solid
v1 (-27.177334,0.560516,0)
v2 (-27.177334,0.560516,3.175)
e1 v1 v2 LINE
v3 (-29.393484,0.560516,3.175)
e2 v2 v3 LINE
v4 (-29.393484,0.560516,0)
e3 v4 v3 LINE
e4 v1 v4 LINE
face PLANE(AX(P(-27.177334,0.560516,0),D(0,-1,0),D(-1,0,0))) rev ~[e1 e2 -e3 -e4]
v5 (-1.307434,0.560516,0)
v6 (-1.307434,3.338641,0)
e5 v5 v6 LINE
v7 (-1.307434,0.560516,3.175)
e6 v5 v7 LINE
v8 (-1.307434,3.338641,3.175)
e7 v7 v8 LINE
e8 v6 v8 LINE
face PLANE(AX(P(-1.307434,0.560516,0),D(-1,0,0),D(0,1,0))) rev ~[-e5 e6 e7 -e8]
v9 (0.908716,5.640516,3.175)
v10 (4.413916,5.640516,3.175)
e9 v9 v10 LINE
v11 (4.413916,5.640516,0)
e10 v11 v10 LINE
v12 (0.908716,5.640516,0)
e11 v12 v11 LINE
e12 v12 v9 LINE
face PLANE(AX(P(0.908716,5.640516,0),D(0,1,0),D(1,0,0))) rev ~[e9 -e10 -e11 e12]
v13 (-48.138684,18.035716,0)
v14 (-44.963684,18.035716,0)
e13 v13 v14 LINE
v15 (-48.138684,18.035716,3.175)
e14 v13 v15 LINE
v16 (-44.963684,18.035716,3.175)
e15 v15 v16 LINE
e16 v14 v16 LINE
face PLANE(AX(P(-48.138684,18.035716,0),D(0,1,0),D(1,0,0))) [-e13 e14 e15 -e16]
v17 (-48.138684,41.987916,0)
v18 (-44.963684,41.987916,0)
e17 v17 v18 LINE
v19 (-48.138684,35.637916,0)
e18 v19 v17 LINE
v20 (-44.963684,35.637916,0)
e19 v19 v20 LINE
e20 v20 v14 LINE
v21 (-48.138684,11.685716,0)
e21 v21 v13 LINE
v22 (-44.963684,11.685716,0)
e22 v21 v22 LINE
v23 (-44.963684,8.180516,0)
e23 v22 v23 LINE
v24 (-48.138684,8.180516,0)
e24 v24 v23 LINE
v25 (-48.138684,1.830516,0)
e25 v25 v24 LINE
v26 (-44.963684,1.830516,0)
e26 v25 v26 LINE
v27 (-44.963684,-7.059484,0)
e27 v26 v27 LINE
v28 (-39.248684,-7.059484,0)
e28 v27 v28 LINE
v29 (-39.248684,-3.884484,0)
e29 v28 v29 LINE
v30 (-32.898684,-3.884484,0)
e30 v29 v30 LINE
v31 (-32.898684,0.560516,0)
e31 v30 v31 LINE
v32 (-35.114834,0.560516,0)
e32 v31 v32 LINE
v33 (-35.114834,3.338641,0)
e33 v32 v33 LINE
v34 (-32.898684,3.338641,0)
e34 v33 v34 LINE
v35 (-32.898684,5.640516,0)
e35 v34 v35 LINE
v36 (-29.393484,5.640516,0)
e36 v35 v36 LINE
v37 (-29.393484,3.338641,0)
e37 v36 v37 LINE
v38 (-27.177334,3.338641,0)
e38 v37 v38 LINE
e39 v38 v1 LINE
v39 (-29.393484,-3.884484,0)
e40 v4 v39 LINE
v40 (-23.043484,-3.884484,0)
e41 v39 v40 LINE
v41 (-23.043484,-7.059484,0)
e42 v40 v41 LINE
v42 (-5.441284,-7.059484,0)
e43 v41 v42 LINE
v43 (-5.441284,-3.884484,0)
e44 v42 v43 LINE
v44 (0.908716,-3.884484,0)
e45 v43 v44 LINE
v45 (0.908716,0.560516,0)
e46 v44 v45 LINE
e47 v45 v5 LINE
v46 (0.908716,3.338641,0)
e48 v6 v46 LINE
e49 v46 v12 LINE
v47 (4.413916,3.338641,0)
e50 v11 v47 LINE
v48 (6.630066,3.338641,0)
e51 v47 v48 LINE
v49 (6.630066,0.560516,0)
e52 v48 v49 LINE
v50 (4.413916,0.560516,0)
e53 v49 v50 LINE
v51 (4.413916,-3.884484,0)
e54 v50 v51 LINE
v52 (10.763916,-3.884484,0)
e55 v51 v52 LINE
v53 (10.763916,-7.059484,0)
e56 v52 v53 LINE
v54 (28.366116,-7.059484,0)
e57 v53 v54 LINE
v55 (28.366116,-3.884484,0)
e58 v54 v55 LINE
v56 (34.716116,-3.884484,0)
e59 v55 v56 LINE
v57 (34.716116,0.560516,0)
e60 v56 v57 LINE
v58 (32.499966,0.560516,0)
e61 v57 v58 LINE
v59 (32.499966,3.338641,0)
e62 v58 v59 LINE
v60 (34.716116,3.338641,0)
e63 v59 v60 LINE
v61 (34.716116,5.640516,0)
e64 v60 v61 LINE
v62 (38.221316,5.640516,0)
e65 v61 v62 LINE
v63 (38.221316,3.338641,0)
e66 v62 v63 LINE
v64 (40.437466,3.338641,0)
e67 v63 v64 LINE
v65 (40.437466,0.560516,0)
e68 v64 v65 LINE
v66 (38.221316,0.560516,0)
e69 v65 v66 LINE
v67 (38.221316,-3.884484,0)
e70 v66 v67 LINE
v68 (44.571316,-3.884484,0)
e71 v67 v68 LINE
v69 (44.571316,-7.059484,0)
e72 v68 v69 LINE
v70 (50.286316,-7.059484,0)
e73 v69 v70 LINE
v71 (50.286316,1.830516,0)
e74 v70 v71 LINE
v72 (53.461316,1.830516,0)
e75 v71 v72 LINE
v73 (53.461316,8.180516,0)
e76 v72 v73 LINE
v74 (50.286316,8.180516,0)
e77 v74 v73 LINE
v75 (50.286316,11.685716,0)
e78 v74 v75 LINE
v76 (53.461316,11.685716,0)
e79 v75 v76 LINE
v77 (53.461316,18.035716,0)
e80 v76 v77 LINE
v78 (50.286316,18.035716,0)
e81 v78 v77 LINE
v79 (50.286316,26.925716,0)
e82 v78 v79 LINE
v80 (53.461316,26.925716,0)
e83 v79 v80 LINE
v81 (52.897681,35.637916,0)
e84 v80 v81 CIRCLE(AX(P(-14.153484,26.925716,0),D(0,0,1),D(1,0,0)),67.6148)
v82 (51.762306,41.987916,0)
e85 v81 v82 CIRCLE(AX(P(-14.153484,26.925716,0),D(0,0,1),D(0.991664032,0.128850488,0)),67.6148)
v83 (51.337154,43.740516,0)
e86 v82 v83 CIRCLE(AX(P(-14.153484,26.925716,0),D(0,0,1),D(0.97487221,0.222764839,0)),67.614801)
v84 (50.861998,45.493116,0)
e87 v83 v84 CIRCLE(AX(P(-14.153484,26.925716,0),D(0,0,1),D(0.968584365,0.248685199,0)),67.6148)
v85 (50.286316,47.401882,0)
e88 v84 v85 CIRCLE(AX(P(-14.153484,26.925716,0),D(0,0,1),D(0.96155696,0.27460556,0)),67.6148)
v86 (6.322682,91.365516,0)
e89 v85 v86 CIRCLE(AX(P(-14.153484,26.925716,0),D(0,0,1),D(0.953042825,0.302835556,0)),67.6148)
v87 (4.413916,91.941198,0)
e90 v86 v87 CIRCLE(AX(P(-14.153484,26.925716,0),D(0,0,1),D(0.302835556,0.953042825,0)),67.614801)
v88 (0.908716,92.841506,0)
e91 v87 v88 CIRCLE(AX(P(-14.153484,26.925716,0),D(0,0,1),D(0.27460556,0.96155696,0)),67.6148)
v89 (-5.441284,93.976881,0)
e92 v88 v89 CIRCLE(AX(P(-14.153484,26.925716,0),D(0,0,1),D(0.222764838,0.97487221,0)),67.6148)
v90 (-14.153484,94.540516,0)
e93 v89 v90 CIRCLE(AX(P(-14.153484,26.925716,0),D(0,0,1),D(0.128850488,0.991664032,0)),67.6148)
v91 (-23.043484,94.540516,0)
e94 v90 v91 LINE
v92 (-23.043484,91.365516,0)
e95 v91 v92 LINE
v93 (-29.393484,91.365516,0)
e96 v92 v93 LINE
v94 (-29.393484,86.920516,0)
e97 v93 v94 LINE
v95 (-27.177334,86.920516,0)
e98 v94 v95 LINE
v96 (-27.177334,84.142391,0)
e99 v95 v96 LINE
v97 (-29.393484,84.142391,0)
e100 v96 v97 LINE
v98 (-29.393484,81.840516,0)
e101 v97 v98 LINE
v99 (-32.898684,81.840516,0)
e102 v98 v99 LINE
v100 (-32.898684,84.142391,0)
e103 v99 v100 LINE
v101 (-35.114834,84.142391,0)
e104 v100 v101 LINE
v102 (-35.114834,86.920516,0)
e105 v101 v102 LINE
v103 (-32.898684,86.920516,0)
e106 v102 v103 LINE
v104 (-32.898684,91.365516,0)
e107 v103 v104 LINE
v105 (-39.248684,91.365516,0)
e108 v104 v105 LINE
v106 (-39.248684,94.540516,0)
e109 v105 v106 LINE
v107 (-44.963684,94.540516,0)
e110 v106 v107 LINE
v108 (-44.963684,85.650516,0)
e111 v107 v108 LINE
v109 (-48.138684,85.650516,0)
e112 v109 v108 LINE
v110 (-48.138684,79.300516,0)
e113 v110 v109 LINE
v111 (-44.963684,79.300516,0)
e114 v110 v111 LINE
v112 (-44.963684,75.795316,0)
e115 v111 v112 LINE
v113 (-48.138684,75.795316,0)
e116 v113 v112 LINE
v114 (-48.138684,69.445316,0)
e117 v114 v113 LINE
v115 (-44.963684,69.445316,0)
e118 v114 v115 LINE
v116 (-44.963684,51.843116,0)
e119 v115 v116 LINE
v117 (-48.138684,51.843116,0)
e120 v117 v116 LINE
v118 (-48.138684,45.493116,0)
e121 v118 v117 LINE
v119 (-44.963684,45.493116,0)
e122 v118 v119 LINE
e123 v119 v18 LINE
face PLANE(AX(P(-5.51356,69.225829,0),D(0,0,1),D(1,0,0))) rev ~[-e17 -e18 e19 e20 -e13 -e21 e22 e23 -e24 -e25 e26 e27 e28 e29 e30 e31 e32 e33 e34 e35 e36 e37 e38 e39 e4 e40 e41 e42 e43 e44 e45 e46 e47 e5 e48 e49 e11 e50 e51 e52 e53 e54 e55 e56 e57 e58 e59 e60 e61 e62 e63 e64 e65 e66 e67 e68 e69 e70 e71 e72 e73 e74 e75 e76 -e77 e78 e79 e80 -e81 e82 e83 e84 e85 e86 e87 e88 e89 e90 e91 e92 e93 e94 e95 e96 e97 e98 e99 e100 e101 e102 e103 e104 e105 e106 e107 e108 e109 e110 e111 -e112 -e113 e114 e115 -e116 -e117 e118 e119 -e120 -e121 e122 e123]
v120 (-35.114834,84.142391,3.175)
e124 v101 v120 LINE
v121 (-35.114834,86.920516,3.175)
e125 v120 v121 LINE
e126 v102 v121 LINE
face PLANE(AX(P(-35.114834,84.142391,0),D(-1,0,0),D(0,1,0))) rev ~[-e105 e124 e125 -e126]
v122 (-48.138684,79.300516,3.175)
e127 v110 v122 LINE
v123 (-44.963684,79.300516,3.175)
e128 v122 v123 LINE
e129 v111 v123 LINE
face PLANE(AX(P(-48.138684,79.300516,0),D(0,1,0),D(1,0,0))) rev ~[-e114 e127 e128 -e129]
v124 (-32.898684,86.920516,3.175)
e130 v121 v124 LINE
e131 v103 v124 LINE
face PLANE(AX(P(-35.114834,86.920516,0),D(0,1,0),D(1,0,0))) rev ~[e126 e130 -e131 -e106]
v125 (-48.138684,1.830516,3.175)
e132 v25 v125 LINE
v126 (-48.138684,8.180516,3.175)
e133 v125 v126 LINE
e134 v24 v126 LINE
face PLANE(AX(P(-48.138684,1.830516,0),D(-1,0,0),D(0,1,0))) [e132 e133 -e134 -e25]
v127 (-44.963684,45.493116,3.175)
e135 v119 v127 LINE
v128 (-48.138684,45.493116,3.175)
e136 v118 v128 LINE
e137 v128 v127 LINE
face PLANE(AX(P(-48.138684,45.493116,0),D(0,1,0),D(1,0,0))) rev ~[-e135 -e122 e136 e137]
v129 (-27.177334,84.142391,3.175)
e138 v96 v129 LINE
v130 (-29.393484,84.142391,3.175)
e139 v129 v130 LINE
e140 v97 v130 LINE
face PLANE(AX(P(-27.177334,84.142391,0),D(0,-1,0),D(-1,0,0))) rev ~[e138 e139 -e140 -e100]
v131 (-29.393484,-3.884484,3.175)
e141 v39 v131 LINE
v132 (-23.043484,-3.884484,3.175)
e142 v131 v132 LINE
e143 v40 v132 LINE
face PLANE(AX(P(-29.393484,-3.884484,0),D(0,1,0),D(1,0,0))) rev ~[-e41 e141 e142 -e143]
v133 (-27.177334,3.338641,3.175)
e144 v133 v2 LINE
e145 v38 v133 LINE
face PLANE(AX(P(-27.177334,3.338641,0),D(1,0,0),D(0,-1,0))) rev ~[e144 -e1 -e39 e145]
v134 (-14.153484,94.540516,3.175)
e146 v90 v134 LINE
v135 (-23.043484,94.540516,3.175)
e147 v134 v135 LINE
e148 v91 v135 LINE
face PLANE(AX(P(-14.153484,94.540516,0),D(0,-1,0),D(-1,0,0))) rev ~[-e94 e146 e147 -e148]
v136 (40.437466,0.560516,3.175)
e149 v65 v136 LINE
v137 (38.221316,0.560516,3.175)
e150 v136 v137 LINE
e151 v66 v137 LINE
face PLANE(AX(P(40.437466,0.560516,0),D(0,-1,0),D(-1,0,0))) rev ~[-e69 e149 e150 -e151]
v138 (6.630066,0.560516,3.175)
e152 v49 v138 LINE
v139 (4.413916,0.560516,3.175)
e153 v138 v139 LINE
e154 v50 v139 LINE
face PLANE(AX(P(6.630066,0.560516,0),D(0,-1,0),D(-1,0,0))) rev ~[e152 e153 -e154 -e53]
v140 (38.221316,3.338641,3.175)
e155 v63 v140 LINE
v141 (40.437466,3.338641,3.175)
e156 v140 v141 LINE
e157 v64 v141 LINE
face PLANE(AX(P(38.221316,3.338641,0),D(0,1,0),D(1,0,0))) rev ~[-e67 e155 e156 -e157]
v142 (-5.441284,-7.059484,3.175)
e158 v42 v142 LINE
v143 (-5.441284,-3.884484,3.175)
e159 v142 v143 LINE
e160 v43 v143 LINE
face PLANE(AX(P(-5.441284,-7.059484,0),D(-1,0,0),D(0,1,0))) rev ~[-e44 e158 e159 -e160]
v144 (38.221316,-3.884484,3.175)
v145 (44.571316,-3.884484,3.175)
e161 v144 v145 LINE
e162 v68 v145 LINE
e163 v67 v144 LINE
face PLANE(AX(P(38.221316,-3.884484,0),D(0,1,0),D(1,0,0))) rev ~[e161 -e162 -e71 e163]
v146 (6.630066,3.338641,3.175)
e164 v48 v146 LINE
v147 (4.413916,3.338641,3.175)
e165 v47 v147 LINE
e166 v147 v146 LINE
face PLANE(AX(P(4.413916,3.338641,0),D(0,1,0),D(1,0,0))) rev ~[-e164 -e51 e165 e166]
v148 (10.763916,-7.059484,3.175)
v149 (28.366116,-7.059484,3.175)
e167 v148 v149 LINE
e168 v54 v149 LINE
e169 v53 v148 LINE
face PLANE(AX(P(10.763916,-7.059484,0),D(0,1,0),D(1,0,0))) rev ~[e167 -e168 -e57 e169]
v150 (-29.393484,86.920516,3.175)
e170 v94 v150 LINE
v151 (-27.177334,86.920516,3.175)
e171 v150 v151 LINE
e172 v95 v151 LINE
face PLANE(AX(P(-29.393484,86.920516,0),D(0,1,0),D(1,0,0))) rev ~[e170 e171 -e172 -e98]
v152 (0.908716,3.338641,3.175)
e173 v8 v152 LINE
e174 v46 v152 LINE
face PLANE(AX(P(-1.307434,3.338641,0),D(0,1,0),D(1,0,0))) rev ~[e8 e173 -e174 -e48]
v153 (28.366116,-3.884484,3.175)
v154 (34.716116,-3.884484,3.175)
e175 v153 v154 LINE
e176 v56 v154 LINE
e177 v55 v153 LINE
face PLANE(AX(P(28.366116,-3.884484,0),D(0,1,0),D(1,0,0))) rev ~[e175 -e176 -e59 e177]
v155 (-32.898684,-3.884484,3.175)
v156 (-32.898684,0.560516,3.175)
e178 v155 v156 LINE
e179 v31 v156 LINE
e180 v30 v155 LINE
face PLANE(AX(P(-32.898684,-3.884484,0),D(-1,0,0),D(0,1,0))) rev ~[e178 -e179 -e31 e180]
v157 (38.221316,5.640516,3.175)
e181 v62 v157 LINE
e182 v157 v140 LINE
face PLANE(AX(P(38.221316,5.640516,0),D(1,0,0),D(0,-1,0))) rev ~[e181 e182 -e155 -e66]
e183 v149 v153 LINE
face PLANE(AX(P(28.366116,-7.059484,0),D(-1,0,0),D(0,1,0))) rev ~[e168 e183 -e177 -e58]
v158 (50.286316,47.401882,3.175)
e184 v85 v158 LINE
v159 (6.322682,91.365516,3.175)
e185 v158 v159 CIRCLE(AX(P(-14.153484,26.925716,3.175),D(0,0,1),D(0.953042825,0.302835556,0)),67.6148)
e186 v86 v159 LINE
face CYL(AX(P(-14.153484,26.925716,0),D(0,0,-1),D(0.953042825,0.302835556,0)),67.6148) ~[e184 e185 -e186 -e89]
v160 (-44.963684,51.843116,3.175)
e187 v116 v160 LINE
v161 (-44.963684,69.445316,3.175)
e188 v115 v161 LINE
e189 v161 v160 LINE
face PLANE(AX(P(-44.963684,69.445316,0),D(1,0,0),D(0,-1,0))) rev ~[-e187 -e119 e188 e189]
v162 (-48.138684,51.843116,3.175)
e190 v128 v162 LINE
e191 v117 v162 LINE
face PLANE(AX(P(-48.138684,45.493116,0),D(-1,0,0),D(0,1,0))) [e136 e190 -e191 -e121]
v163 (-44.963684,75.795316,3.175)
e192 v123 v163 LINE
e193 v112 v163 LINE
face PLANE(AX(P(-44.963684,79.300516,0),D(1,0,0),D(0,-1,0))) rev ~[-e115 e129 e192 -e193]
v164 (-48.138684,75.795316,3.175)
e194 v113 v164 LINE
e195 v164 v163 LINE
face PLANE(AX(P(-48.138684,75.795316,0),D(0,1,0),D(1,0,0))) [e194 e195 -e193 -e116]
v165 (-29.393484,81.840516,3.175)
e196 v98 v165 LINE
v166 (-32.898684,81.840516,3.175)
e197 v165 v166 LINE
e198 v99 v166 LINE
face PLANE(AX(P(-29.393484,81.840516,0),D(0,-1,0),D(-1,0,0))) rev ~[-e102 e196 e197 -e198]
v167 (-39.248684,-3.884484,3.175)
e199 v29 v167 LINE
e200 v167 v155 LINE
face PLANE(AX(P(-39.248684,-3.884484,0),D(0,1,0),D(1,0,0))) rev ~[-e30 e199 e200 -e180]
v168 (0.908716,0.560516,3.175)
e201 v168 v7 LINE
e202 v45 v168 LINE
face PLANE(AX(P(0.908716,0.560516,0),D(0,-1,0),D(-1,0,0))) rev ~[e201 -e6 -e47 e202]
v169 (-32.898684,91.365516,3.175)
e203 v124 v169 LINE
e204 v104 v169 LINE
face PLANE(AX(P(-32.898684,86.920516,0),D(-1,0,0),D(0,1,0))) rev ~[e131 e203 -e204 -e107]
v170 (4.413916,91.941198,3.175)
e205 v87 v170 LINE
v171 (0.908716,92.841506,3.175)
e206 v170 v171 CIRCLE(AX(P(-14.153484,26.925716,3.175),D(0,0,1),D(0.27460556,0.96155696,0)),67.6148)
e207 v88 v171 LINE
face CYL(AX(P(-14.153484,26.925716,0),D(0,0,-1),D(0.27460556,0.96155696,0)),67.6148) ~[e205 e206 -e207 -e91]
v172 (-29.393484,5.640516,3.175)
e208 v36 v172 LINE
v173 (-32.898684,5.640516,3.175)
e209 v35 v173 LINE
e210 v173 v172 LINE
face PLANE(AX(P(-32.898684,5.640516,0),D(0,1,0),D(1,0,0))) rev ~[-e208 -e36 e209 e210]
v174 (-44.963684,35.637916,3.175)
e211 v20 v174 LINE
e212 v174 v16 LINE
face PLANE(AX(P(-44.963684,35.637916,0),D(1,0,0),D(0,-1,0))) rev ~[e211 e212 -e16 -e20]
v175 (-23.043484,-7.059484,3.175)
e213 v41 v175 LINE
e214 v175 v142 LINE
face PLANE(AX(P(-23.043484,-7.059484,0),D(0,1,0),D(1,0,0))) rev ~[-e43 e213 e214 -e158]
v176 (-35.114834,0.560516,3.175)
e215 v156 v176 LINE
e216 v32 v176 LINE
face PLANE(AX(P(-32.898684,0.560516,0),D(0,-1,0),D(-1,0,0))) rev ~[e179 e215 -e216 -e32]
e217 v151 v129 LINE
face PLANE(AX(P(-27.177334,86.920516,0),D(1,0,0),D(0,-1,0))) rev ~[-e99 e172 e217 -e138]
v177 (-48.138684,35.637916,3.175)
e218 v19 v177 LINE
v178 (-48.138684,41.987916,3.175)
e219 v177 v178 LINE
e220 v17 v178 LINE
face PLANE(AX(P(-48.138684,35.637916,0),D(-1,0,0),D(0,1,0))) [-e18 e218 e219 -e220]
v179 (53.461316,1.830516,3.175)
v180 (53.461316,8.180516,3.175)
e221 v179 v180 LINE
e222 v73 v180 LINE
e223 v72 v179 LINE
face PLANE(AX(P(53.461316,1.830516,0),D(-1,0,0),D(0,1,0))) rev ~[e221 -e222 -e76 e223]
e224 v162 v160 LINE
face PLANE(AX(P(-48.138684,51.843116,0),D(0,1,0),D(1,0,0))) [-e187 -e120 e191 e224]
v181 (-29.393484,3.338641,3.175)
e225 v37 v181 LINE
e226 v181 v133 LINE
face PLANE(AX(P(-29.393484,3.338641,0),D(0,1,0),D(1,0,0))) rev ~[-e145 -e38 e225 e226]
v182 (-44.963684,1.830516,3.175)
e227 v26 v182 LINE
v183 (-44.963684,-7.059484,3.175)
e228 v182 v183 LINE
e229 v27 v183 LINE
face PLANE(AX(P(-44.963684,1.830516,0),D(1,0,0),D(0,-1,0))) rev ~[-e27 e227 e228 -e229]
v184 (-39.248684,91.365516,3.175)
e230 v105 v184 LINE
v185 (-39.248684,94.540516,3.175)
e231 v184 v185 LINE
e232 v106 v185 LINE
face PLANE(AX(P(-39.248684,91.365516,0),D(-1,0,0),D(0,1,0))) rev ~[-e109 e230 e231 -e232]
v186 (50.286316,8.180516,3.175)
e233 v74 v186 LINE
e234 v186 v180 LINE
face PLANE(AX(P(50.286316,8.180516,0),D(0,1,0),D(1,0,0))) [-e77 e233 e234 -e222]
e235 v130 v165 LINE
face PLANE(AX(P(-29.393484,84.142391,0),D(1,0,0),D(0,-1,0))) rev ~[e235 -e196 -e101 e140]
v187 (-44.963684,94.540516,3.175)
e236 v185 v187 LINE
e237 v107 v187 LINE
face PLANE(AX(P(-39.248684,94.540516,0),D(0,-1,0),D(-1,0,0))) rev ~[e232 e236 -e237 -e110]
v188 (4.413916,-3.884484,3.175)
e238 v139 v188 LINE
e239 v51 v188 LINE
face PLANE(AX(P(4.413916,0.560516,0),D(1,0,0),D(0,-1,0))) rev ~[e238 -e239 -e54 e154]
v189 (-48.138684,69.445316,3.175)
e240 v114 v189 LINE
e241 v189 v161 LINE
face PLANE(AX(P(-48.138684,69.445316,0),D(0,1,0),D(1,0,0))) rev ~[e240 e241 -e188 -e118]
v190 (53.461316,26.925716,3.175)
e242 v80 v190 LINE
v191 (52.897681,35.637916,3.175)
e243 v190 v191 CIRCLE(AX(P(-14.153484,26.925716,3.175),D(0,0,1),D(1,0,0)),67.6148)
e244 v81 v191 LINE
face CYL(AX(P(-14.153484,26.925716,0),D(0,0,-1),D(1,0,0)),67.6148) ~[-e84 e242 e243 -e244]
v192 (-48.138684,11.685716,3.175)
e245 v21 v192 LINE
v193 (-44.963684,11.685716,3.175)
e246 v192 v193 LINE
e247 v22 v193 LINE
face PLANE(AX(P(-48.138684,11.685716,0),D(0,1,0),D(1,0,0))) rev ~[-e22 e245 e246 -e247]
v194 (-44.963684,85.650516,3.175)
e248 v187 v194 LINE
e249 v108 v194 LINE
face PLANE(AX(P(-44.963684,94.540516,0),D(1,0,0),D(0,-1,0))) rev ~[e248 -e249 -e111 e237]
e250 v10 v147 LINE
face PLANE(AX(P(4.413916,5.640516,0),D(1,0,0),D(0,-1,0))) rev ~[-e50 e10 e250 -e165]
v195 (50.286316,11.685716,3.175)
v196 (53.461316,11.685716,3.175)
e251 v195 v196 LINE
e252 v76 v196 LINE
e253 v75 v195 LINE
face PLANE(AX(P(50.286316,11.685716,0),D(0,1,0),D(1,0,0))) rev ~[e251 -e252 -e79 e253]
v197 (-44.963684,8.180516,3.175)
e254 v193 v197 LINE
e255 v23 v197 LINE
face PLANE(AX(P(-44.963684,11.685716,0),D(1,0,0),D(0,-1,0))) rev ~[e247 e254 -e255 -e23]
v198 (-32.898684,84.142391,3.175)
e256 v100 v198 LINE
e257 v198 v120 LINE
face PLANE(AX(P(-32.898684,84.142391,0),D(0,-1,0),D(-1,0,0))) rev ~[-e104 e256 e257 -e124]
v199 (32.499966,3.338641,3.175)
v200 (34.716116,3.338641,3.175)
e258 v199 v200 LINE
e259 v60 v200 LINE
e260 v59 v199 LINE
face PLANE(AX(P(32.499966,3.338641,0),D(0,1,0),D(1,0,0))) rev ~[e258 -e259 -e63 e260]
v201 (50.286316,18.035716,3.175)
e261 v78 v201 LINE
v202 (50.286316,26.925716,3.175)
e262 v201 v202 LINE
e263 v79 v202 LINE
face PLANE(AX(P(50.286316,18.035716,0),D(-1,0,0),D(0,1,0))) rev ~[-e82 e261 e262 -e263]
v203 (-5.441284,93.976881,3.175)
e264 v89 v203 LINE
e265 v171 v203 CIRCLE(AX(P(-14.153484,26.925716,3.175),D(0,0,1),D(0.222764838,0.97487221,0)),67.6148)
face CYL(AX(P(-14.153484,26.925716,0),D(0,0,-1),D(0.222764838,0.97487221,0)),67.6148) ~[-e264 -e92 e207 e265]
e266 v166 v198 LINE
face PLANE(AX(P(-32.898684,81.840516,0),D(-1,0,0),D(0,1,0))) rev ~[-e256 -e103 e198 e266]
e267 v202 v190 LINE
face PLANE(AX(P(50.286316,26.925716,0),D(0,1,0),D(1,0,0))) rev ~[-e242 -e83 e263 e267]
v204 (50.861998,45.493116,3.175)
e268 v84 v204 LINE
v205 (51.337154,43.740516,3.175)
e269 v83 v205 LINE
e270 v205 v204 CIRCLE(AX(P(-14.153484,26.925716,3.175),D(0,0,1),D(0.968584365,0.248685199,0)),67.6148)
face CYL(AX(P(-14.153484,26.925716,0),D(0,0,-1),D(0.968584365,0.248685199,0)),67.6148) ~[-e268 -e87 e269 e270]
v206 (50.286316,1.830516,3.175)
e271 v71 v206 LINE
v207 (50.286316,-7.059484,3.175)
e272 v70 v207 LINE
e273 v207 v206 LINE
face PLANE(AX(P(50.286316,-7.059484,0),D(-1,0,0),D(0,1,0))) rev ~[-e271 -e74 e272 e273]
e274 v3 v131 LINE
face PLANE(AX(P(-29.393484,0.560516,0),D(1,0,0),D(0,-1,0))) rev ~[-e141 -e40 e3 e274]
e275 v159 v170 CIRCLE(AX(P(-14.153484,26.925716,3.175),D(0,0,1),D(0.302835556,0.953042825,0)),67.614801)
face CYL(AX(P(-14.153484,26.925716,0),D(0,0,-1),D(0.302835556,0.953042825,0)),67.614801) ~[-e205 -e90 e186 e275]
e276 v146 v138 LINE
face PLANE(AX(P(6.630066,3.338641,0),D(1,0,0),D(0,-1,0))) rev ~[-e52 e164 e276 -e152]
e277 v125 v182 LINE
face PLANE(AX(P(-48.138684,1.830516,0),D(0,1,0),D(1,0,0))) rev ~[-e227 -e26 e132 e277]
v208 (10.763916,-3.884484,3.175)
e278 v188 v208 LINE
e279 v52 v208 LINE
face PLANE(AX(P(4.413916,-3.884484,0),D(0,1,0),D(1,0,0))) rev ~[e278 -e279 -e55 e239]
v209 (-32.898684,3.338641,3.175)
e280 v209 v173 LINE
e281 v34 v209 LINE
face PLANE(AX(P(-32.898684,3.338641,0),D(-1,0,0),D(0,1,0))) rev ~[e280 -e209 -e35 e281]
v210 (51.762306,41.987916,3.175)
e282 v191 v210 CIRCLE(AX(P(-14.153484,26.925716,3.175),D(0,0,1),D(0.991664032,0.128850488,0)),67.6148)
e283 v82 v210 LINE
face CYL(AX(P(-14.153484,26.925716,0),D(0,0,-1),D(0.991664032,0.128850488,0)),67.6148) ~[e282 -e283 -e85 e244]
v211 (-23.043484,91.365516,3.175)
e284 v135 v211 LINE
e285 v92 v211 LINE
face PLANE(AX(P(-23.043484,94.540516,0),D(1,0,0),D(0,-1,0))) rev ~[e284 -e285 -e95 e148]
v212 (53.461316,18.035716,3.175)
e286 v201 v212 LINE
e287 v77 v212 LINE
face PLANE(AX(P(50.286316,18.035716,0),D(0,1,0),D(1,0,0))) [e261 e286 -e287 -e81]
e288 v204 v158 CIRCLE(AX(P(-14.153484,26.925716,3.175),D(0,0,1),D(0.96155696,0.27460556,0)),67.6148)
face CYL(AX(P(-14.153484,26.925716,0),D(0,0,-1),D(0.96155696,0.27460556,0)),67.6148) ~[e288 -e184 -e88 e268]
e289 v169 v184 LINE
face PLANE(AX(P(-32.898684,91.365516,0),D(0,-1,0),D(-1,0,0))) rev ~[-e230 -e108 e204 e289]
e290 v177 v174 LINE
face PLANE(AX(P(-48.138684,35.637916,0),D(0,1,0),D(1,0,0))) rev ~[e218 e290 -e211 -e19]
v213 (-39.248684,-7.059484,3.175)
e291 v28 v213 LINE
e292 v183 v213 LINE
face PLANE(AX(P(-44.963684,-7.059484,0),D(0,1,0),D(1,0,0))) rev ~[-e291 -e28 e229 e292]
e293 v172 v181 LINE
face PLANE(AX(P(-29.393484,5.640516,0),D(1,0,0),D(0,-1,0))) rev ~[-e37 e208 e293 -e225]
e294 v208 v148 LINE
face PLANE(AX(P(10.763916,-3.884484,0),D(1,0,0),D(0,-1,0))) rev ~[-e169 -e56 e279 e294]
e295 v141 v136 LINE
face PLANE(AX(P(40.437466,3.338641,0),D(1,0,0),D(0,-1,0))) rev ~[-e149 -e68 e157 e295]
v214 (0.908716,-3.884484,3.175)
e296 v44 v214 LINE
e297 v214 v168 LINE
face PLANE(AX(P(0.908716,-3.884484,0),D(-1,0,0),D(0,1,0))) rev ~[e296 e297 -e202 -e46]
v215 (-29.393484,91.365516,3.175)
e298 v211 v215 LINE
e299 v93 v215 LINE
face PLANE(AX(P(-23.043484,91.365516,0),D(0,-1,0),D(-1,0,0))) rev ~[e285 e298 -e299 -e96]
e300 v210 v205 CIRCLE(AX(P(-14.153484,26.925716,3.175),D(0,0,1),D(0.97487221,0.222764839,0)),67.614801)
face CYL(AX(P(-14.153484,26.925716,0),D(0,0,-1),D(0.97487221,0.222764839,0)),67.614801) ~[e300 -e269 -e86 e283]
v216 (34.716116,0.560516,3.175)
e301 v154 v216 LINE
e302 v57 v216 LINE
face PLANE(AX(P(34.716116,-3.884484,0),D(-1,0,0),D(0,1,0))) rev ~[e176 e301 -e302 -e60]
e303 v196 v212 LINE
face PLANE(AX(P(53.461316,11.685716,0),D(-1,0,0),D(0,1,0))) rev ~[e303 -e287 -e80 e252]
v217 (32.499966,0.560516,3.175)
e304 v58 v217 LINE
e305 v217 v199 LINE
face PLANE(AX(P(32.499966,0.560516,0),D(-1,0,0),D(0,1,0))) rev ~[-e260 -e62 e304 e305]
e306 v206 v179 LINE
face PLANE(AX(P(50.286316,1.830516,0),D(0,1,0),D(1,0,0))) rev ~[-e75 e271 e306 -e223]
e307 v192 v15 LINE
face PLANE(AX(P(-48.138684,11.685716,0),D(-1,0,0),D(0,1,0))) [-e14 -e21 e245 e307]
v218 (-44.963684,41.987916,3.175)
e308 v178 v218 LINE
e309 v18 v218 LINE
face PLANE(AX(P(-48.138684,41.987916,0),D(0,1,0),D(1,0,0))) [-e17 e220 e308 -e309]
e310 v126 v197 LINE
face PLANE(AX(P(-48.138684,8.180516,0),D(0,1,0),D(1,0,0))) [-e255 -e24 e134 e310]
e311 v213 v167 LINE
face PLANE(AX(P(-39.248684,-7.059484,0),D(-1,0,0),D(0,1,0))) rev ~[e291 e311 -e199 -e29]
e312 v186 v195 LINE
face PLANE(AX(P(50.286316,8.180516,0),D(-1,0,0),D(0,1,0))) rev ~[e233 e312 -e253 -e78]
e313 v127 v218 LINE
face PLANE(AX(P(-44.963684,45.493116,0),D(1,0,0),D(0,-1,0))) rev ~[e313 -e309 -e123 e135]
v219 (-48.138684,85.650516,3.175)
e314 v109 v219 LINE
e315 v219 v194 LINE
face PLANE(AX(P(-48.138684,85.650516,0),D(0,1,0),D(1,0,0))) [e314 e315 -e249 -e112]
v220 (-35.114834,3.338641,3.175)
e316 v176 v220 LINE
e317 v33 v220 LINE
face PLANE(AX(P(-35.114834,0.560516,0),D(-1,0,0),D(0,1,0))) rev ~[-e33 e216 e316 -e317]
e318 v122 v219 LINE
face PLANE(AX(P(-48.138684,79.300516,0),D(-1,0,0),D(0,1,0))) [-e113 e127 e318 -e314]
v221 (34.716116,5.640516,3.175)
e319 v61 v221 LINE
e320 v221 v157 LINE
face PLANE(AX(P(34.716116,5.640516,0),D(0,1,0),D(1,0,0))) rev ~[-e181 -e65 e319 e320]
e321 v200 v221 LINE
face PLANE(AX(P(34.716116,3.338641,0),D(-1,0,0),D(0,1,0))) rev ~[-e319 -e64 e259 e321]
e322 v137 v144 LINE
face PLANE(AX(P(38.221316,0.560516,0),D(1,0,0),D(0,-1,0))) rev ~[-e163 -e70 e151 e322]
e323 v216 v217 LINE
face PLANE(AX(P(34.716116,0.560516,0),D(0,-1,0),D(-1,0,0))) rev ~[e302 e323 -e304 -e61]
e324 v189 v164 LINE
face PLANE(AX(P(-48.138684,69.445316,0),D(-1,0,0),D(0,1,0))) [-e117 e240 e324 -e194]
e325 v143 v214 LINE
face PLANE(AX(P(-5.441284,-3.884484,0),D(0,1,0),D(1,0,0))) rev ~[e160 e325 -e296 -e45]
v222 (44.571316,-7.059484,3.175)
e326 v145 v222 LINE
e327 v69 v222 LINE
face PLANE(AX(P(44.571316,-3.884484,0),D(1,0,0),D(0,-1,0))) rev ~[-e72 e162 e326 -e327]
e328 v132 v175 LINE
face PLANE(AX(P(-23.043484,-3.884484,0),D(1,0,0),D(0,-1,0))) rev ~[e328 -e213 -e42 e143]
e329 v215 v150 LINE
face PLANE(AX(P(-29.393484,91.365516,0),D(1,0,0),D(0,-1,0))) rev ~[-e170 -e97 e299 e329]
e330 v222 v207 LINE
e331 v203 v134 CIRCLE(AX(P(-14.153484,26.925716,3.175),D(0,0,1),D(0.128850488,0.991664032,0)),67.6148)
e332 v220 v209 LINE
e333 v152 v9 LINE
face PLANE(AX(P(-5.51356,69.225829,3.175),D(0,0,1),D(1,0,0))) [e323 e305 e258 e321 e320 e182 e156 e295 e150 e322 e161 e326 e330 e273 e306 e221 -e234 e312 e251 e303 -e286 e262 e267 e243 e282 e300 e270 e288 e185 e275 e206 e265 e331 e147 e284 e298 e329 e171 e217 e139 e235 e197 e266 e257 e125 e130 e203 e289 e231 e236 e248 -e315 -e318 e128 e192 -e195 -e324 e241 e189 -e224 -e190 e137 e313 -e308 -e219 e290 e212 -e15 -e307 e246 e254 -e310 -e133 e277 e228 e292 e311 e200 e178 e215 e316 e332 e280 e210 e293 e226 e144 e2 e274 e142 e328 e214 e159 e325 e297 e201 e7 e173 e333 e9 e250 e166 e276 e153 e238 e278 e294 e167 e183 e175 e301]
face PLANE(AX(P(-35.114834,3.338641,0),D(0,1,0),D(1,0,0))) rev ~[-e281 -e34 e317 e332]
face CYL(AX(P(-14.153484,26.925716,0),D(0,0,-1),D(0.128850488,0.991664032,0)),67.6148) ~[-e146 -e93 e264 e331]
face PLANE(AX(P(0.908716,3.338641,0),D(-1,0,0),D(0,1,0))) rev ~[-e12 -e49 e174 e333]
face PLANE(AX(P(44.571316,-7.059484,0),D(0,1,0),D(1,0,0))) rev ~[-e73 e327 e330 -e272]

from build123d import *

# Parameters (mm, degrees)
F0_W     = 3.175
F0_H     = 6.35
F0_W_2   = 3.5052
F0_H_2   = 4.445
F0_H_3   = 2.778125
F0_W_3   = 2.21615
F0_H_4   = 2.301875
F1_DEPTH = 3.175


with BuildPart() as f1:
    # F0 (on Top) → F1 (new body)
    with BuildSketch(Plane.XY):
        with BuildLine():
            Line((-39.248683933, 94.5405161858), (-44.963683933, 94.5405161858))
            Line((-44.963683933, 94.5405161858), (-44.963683933, 85.6505161858))
            Line((-44.963683933, 85.6505161858), (-44.963683933, 79.3005161858))
            Line((-44.963683933, 79.3005161858), (-44.963683933, 75.7953161858))
            Line((-44.963683933, 75.7953161858), (-44.963683933, 69.4453161858))
            Line((-44.963683933, 69.4453161858), (-44.963683933, 51.8431161858))
            Line((-44.963683933, 51.8431161858), (-44.963683933, 45.4931161858))
            Line((-44.963683933, 45.4931161858), (-44.963683933, 43.7405161858))
            Line((-44.963683933, 43.7405161858), (50.286316067, 43.7405161858))
            Line((50.286316067, 43.7405161858), (50.286316067, 45.4931161858))
            Line((50.286316067, 45.4931161858), (50.286316067, 47.4018817204))
            ThreePointArc((50.286316067, 47.4018817204), (33.6573996556, 74.7365997743), (6.3226816016, 91.3655161858))
            Line((6.3226816016, 91.3655161858), (4.413916067, 91.3655161858))
            Line((4.413916067, 91.3655161858), (4.413916067, 86.9205161858))
            Line((4.413916067, 86.9205161858), (6.630066067, 86.9205161858))
            Line((6.630066067, 86.9205161858), (6.630066067, 84.1423911858))
            Line((6.630066067, 84.1423911858), (4.413916067, 84.1423911858))
            Line((4.413916067, 84.1423911858), (4.413916067, 81.8405161858))
            Line((4.413916067, 81.8405161858), (0.908716067, 81.8405161858))
            Line((0.908716067, 81.8405161858), (0.908716067, 84.1423911858))
            Line((0.908716067, 84.1423911858), (-1.307433933, 84.1423911858))
            Line((-1.307433933, 84.1423911858), (-1.307433933, 86.9205161858))
            Line((-1.307433933, 86.9205161858), (0.908716067, 86.9205161858))
            Line((0.908716067, 86.9205161858), (0.908716067, 91.3655161858))
            Line((0.908716067, 91.3655161858), (-5.441283933, 91.3655161858))
            Line((-5.441283933, 91.3655161858), (-5.441283933, 93.9768813524))
            ThreePointArc((-5.441283933, 93.9768813524), (-9.7882773782, 94.3994603443), (-14.153483933, 94.5405161858))
            Line((-14.153483933, 94.5405161858), (-23.043483933, 94.5405161858))
            Line((-23.043483933, 94.5405161858), (-23.043483933, 91.3655161858))
            Line((-23.043483933, 91.3655161858), (-29.393483933, 91.3655161858))
            Line((-29.393483933, 91.3655161858), (-29.393483933, 86.9205161858))
            Line((-29.393483933, 86.9205161858), (-27.177333933, 86.9205161858))
            Line((-27.177333933, 86.9205161858), (-27.177333933, 84.1423911858))
            Line((-27.177333933, 84.1423911858), (-29.393483933, 84.1423911858))
            Line((-29.393483933, 84.1423911858), (-29.393483933, 81.8405161858))
            Line((-29.393483933, 81.8405161858), (-32.898683933, 81.8405161858))
            Line((-32.898683933, 81.8405161858), (-32.898683933, 84.1423911858))
            Line((-32.898683933, 84.1423911858), (-35.114833933, 84.1423911858))
            Line((-35.114833933, 84.1423911858), (-35.114833933, 86.9205161858))
            Line((-35.114833933, 86.9205161858), (-32.898683933, 86.9205161858))
            Line((-32.898683933, 86.9205161858), (-32.898683933, 91.3655161858))
            Line((-32.898683933, 91.3655161858), (-39.248683933, 91.3655161858))
            Line((-39.248683933, 91.3655161858), (-39.248683933, 94.5405161858))
        make_face()
        with Locations((-46.551183933, 82.4755161858)):
            Rectangle(F0_W, F0_H)
        with Locations((-46.551183933, 72.6203161858)):
            Rectangle(F0_W, F0_H)
        with Locations((-46.551183933, 48.6681161858)):
            Rectangle(F0_W, F0_H)
        with BuildLine():
            ThreePointArc((0.908716067, 92.8415057221), (-2.252736339, 93.4849633701), (-5.441283933, 93.9768813524))
            Line((-5.441283933, 93.9768813524), (-5.441283933, 91.3655161858))
            Line((-5.441283933, 91.3655161858), (0.908716067, 91.3655161858))
            Line((0.908716067, 91.3655161858), (0.908716067, 92.8415057221))
        make_face()
        with BuildLine():
            ThreePointArc((4.413916067, 91.9411976981), (2.6673405912, 92.4148071961), (0.908716067, 92.8415057221))
            Line((0.908716067, 92.8415057221), (0.908716067, 91.3655161858))
            Line((0.908716067, 91.3655161858), (4.413916067, 91.3655161858))
            Line((4.413916067, 91.3655161858), (4.413916067, 91.9411976981))
        make_face()
        Polygon((50.286316067, 43.7405161858), (-44.963683933, 43.7405161858), (-44.963683933, 41.9879161858), (-44.963683933, 35.6379161858), (-44.963683933, 18.0357161858), (-44.963683933, 11.6857161858), (-44.963683933, 8.1805161858), (-44.963683933, 1.8305161858), (-44.963683933, -7.0594838142), (-39.248683933, -7.0594838142), (-39.248683933, -3.8844838142), (-32.898683933, -3.8844838142), (-32.898683933, 0.5605161858), (-35.114833933, 0.5605161858), (-35.114833933, 3.3386411858), (-32.898683933, 3.3386411858), (-32.898683933, 5.6405161858), (-29.393483933, 5.6405161858), (-29.393483933, 3.3386411858), (-27.177333933, 3.3386411858), (-27.177333933, 0.5605161858), (-29.393483933, 0.5605161858), (-29.393483933, -3.8844838142), (-23.043483933, -3.8844838142), (-23.043483933, -7.0594838142), (-5.441283933, -7.0594838142), (-5.441283933, -3.8844838142), (0.908716067, -3.8844838142), (0.908716067, 0.5605161858), (-1.307433933, 0.5605161858), (-1.307433933, 3.3386411858), (0.908716067, 3.3386411858), (0.908716067, 5.6405161858), (4.413916067, 5.6405161858), (4.413916067, 3.3386411858), (6.630066067, 3.3386411858), (6.630066067, 0.5605161858), (4.413916067, 0.5605161858), (4.413916067, -3.8844838142), (10.763916067, -3.8844838142), (10.763916067, -7.0594838142), (28.366116067, -7.0594838142), (28.366116067, -3.8844838142), (34.716116067, -3.8844838142), (34.716116067, 0.5605161858), (32.499966067, 0.5605161858), (32.499966067, 3.3386411858), (34.716116067, 3.3386411858), (34.716116067, 5.6405161858), (38.221316067, 5.6405161858), (38.221316067, 3.3386411858), (40.437466067, 3.3386411858), (40.437466067, 0.5605161858), (38.221316067, 0.5605161858), (38.221316067, -3.8844838142), (44.571316067, -3.8844838142), (44.571316067, -7.0594838142), (50.286316067, -7.0594838142), (50.286316067, 1.8305161858), (50.286316067, 8.1805161858), (50.286316067, 11.6857161858), (50.286316067, 18.0357161858), (50.286316067, 26.9257161858), (50.286316067, 35.6379161858), (50.286316067, 41.9879161858), align=None)
        with Locations((-46.551183933, 38.8129161858)):
            Rectangle(F0_W, F0_H)
        with Locations((2.661316067, 89.1430161858)):
            Rectangle(F0_W_2, F0_H_2)
        with BuildLine():
            ThreePointArc((6.3226816016, 91.3655161858), (5.3704207665, 91.6603925526), (4.413916067, 91.9411976981))
            Line((4.413916067, 91.9411976981), (4.413916067, 91.3655161858))
            Line((4.413916067, 91.3655161858), (6.3226816016, 91.3655161858))
        make_face()
        with BuildLine():
            Line((50.286316067, 45.4931161858), (50.286316067, 43.7405161858))
            Line((50.286316067, 43.7405161858), (51.3371541766, 43.7405161858))
            ThreePointArc((51.3371541766, 43.7405161858), (51.1054596409, 44.6184113637), (50.8619975793, 45.4931161858))
            Line((50.8619975793, 45.4931161858), (50.286316067, 45.4931161858))
        make_face()
        with BuildLine():
            Line((51.3371541766, 43.7405161858), (50.286316067, 43.7405161858))
            Line((50.286316067, 43.7405161858), (50.286316067, 41.9879161858))
            Line((50.286316067, 41.9879161858), (51.7623056033, 41.9879161858))
            ThreePointArc((51.7623056033, 41.9879161858), (51.5555733449, 42.8656337101), (51.3371541766, 43.7405161858))
        make_face()
        with Locations((2.661316067, 85.5314536858)):
            Rectangle(F0_W_2, F0_H_3)
        with Locations((-0.199358933, 85.5314536858)):
            Rectangle(F0_W_3, F0_H_3)
        with BuildLine():
            Line((51.7623056033, 41.9879161858), (50.286316067, 41.9879161858))
            Line((50.286316067, 41.9879161858), (50.286316067, 35.6379161858))
            Line((50.286316067, 35.6379161858), (52.8976812336, 35.6379161858))
            ThreePointArc((52.8976812336, 35.6379161858), (52.4057632513, 38.8264637797), (51.7623056033, 41.9879161858))
        make_face()
        with BuildLine():
            Line((50.286316067, 47.4018817204), (50.286316067, 45.4931161858))
            Line((50.286316067, 45.4931161858), (50.8619975793, 45.4931161858))
            ThreePointArc((50.8619975793, 45.4931161858), (50.5811924339, 46.4496208852), (50.286316067, 47.4018817204))
        make_face()
        with Locations((-46.551183933, 14.8607161858)):
            Rectangle(F0_W, F0_H)
        with Locations((5.521991067, 85.5314536858)):
            Rectangle(F0_W_3, F0_H_3)
        with Locations((2.661316067, 82.9914536858)):
            Rectangle(F0_W_2, F0_H_4)
        with BuildLine():
            Line((52.8976812336, 35.6379161858), (50.286316067, 35.6379161858))
            Line((50.286316067, 35.6379161858), (50.286316067, 26.9257161858))
            Line((50.286316067, 26.9257161858), (53.461316067, 26.9257161858))
            ThreePointArc((53.461316067, 26.9257161858), (53.3202602255, 31.2909227406), (52.8976812336, 35.6379161858))
        make_face()
        with Locations((-46.551183933, 5.0055161858)):
            Rectangle(F0_W, F0_H)
        with Locations((51.873816067, 14.8607161858)):
            Rectangle(F0_W, F0_H)
        with Locations((51.873816067, 5.0055161858)):
            Rectangle(F0_W, F0_H)
    extrude(amount=F1_DEPTH)


solid = f1.part
